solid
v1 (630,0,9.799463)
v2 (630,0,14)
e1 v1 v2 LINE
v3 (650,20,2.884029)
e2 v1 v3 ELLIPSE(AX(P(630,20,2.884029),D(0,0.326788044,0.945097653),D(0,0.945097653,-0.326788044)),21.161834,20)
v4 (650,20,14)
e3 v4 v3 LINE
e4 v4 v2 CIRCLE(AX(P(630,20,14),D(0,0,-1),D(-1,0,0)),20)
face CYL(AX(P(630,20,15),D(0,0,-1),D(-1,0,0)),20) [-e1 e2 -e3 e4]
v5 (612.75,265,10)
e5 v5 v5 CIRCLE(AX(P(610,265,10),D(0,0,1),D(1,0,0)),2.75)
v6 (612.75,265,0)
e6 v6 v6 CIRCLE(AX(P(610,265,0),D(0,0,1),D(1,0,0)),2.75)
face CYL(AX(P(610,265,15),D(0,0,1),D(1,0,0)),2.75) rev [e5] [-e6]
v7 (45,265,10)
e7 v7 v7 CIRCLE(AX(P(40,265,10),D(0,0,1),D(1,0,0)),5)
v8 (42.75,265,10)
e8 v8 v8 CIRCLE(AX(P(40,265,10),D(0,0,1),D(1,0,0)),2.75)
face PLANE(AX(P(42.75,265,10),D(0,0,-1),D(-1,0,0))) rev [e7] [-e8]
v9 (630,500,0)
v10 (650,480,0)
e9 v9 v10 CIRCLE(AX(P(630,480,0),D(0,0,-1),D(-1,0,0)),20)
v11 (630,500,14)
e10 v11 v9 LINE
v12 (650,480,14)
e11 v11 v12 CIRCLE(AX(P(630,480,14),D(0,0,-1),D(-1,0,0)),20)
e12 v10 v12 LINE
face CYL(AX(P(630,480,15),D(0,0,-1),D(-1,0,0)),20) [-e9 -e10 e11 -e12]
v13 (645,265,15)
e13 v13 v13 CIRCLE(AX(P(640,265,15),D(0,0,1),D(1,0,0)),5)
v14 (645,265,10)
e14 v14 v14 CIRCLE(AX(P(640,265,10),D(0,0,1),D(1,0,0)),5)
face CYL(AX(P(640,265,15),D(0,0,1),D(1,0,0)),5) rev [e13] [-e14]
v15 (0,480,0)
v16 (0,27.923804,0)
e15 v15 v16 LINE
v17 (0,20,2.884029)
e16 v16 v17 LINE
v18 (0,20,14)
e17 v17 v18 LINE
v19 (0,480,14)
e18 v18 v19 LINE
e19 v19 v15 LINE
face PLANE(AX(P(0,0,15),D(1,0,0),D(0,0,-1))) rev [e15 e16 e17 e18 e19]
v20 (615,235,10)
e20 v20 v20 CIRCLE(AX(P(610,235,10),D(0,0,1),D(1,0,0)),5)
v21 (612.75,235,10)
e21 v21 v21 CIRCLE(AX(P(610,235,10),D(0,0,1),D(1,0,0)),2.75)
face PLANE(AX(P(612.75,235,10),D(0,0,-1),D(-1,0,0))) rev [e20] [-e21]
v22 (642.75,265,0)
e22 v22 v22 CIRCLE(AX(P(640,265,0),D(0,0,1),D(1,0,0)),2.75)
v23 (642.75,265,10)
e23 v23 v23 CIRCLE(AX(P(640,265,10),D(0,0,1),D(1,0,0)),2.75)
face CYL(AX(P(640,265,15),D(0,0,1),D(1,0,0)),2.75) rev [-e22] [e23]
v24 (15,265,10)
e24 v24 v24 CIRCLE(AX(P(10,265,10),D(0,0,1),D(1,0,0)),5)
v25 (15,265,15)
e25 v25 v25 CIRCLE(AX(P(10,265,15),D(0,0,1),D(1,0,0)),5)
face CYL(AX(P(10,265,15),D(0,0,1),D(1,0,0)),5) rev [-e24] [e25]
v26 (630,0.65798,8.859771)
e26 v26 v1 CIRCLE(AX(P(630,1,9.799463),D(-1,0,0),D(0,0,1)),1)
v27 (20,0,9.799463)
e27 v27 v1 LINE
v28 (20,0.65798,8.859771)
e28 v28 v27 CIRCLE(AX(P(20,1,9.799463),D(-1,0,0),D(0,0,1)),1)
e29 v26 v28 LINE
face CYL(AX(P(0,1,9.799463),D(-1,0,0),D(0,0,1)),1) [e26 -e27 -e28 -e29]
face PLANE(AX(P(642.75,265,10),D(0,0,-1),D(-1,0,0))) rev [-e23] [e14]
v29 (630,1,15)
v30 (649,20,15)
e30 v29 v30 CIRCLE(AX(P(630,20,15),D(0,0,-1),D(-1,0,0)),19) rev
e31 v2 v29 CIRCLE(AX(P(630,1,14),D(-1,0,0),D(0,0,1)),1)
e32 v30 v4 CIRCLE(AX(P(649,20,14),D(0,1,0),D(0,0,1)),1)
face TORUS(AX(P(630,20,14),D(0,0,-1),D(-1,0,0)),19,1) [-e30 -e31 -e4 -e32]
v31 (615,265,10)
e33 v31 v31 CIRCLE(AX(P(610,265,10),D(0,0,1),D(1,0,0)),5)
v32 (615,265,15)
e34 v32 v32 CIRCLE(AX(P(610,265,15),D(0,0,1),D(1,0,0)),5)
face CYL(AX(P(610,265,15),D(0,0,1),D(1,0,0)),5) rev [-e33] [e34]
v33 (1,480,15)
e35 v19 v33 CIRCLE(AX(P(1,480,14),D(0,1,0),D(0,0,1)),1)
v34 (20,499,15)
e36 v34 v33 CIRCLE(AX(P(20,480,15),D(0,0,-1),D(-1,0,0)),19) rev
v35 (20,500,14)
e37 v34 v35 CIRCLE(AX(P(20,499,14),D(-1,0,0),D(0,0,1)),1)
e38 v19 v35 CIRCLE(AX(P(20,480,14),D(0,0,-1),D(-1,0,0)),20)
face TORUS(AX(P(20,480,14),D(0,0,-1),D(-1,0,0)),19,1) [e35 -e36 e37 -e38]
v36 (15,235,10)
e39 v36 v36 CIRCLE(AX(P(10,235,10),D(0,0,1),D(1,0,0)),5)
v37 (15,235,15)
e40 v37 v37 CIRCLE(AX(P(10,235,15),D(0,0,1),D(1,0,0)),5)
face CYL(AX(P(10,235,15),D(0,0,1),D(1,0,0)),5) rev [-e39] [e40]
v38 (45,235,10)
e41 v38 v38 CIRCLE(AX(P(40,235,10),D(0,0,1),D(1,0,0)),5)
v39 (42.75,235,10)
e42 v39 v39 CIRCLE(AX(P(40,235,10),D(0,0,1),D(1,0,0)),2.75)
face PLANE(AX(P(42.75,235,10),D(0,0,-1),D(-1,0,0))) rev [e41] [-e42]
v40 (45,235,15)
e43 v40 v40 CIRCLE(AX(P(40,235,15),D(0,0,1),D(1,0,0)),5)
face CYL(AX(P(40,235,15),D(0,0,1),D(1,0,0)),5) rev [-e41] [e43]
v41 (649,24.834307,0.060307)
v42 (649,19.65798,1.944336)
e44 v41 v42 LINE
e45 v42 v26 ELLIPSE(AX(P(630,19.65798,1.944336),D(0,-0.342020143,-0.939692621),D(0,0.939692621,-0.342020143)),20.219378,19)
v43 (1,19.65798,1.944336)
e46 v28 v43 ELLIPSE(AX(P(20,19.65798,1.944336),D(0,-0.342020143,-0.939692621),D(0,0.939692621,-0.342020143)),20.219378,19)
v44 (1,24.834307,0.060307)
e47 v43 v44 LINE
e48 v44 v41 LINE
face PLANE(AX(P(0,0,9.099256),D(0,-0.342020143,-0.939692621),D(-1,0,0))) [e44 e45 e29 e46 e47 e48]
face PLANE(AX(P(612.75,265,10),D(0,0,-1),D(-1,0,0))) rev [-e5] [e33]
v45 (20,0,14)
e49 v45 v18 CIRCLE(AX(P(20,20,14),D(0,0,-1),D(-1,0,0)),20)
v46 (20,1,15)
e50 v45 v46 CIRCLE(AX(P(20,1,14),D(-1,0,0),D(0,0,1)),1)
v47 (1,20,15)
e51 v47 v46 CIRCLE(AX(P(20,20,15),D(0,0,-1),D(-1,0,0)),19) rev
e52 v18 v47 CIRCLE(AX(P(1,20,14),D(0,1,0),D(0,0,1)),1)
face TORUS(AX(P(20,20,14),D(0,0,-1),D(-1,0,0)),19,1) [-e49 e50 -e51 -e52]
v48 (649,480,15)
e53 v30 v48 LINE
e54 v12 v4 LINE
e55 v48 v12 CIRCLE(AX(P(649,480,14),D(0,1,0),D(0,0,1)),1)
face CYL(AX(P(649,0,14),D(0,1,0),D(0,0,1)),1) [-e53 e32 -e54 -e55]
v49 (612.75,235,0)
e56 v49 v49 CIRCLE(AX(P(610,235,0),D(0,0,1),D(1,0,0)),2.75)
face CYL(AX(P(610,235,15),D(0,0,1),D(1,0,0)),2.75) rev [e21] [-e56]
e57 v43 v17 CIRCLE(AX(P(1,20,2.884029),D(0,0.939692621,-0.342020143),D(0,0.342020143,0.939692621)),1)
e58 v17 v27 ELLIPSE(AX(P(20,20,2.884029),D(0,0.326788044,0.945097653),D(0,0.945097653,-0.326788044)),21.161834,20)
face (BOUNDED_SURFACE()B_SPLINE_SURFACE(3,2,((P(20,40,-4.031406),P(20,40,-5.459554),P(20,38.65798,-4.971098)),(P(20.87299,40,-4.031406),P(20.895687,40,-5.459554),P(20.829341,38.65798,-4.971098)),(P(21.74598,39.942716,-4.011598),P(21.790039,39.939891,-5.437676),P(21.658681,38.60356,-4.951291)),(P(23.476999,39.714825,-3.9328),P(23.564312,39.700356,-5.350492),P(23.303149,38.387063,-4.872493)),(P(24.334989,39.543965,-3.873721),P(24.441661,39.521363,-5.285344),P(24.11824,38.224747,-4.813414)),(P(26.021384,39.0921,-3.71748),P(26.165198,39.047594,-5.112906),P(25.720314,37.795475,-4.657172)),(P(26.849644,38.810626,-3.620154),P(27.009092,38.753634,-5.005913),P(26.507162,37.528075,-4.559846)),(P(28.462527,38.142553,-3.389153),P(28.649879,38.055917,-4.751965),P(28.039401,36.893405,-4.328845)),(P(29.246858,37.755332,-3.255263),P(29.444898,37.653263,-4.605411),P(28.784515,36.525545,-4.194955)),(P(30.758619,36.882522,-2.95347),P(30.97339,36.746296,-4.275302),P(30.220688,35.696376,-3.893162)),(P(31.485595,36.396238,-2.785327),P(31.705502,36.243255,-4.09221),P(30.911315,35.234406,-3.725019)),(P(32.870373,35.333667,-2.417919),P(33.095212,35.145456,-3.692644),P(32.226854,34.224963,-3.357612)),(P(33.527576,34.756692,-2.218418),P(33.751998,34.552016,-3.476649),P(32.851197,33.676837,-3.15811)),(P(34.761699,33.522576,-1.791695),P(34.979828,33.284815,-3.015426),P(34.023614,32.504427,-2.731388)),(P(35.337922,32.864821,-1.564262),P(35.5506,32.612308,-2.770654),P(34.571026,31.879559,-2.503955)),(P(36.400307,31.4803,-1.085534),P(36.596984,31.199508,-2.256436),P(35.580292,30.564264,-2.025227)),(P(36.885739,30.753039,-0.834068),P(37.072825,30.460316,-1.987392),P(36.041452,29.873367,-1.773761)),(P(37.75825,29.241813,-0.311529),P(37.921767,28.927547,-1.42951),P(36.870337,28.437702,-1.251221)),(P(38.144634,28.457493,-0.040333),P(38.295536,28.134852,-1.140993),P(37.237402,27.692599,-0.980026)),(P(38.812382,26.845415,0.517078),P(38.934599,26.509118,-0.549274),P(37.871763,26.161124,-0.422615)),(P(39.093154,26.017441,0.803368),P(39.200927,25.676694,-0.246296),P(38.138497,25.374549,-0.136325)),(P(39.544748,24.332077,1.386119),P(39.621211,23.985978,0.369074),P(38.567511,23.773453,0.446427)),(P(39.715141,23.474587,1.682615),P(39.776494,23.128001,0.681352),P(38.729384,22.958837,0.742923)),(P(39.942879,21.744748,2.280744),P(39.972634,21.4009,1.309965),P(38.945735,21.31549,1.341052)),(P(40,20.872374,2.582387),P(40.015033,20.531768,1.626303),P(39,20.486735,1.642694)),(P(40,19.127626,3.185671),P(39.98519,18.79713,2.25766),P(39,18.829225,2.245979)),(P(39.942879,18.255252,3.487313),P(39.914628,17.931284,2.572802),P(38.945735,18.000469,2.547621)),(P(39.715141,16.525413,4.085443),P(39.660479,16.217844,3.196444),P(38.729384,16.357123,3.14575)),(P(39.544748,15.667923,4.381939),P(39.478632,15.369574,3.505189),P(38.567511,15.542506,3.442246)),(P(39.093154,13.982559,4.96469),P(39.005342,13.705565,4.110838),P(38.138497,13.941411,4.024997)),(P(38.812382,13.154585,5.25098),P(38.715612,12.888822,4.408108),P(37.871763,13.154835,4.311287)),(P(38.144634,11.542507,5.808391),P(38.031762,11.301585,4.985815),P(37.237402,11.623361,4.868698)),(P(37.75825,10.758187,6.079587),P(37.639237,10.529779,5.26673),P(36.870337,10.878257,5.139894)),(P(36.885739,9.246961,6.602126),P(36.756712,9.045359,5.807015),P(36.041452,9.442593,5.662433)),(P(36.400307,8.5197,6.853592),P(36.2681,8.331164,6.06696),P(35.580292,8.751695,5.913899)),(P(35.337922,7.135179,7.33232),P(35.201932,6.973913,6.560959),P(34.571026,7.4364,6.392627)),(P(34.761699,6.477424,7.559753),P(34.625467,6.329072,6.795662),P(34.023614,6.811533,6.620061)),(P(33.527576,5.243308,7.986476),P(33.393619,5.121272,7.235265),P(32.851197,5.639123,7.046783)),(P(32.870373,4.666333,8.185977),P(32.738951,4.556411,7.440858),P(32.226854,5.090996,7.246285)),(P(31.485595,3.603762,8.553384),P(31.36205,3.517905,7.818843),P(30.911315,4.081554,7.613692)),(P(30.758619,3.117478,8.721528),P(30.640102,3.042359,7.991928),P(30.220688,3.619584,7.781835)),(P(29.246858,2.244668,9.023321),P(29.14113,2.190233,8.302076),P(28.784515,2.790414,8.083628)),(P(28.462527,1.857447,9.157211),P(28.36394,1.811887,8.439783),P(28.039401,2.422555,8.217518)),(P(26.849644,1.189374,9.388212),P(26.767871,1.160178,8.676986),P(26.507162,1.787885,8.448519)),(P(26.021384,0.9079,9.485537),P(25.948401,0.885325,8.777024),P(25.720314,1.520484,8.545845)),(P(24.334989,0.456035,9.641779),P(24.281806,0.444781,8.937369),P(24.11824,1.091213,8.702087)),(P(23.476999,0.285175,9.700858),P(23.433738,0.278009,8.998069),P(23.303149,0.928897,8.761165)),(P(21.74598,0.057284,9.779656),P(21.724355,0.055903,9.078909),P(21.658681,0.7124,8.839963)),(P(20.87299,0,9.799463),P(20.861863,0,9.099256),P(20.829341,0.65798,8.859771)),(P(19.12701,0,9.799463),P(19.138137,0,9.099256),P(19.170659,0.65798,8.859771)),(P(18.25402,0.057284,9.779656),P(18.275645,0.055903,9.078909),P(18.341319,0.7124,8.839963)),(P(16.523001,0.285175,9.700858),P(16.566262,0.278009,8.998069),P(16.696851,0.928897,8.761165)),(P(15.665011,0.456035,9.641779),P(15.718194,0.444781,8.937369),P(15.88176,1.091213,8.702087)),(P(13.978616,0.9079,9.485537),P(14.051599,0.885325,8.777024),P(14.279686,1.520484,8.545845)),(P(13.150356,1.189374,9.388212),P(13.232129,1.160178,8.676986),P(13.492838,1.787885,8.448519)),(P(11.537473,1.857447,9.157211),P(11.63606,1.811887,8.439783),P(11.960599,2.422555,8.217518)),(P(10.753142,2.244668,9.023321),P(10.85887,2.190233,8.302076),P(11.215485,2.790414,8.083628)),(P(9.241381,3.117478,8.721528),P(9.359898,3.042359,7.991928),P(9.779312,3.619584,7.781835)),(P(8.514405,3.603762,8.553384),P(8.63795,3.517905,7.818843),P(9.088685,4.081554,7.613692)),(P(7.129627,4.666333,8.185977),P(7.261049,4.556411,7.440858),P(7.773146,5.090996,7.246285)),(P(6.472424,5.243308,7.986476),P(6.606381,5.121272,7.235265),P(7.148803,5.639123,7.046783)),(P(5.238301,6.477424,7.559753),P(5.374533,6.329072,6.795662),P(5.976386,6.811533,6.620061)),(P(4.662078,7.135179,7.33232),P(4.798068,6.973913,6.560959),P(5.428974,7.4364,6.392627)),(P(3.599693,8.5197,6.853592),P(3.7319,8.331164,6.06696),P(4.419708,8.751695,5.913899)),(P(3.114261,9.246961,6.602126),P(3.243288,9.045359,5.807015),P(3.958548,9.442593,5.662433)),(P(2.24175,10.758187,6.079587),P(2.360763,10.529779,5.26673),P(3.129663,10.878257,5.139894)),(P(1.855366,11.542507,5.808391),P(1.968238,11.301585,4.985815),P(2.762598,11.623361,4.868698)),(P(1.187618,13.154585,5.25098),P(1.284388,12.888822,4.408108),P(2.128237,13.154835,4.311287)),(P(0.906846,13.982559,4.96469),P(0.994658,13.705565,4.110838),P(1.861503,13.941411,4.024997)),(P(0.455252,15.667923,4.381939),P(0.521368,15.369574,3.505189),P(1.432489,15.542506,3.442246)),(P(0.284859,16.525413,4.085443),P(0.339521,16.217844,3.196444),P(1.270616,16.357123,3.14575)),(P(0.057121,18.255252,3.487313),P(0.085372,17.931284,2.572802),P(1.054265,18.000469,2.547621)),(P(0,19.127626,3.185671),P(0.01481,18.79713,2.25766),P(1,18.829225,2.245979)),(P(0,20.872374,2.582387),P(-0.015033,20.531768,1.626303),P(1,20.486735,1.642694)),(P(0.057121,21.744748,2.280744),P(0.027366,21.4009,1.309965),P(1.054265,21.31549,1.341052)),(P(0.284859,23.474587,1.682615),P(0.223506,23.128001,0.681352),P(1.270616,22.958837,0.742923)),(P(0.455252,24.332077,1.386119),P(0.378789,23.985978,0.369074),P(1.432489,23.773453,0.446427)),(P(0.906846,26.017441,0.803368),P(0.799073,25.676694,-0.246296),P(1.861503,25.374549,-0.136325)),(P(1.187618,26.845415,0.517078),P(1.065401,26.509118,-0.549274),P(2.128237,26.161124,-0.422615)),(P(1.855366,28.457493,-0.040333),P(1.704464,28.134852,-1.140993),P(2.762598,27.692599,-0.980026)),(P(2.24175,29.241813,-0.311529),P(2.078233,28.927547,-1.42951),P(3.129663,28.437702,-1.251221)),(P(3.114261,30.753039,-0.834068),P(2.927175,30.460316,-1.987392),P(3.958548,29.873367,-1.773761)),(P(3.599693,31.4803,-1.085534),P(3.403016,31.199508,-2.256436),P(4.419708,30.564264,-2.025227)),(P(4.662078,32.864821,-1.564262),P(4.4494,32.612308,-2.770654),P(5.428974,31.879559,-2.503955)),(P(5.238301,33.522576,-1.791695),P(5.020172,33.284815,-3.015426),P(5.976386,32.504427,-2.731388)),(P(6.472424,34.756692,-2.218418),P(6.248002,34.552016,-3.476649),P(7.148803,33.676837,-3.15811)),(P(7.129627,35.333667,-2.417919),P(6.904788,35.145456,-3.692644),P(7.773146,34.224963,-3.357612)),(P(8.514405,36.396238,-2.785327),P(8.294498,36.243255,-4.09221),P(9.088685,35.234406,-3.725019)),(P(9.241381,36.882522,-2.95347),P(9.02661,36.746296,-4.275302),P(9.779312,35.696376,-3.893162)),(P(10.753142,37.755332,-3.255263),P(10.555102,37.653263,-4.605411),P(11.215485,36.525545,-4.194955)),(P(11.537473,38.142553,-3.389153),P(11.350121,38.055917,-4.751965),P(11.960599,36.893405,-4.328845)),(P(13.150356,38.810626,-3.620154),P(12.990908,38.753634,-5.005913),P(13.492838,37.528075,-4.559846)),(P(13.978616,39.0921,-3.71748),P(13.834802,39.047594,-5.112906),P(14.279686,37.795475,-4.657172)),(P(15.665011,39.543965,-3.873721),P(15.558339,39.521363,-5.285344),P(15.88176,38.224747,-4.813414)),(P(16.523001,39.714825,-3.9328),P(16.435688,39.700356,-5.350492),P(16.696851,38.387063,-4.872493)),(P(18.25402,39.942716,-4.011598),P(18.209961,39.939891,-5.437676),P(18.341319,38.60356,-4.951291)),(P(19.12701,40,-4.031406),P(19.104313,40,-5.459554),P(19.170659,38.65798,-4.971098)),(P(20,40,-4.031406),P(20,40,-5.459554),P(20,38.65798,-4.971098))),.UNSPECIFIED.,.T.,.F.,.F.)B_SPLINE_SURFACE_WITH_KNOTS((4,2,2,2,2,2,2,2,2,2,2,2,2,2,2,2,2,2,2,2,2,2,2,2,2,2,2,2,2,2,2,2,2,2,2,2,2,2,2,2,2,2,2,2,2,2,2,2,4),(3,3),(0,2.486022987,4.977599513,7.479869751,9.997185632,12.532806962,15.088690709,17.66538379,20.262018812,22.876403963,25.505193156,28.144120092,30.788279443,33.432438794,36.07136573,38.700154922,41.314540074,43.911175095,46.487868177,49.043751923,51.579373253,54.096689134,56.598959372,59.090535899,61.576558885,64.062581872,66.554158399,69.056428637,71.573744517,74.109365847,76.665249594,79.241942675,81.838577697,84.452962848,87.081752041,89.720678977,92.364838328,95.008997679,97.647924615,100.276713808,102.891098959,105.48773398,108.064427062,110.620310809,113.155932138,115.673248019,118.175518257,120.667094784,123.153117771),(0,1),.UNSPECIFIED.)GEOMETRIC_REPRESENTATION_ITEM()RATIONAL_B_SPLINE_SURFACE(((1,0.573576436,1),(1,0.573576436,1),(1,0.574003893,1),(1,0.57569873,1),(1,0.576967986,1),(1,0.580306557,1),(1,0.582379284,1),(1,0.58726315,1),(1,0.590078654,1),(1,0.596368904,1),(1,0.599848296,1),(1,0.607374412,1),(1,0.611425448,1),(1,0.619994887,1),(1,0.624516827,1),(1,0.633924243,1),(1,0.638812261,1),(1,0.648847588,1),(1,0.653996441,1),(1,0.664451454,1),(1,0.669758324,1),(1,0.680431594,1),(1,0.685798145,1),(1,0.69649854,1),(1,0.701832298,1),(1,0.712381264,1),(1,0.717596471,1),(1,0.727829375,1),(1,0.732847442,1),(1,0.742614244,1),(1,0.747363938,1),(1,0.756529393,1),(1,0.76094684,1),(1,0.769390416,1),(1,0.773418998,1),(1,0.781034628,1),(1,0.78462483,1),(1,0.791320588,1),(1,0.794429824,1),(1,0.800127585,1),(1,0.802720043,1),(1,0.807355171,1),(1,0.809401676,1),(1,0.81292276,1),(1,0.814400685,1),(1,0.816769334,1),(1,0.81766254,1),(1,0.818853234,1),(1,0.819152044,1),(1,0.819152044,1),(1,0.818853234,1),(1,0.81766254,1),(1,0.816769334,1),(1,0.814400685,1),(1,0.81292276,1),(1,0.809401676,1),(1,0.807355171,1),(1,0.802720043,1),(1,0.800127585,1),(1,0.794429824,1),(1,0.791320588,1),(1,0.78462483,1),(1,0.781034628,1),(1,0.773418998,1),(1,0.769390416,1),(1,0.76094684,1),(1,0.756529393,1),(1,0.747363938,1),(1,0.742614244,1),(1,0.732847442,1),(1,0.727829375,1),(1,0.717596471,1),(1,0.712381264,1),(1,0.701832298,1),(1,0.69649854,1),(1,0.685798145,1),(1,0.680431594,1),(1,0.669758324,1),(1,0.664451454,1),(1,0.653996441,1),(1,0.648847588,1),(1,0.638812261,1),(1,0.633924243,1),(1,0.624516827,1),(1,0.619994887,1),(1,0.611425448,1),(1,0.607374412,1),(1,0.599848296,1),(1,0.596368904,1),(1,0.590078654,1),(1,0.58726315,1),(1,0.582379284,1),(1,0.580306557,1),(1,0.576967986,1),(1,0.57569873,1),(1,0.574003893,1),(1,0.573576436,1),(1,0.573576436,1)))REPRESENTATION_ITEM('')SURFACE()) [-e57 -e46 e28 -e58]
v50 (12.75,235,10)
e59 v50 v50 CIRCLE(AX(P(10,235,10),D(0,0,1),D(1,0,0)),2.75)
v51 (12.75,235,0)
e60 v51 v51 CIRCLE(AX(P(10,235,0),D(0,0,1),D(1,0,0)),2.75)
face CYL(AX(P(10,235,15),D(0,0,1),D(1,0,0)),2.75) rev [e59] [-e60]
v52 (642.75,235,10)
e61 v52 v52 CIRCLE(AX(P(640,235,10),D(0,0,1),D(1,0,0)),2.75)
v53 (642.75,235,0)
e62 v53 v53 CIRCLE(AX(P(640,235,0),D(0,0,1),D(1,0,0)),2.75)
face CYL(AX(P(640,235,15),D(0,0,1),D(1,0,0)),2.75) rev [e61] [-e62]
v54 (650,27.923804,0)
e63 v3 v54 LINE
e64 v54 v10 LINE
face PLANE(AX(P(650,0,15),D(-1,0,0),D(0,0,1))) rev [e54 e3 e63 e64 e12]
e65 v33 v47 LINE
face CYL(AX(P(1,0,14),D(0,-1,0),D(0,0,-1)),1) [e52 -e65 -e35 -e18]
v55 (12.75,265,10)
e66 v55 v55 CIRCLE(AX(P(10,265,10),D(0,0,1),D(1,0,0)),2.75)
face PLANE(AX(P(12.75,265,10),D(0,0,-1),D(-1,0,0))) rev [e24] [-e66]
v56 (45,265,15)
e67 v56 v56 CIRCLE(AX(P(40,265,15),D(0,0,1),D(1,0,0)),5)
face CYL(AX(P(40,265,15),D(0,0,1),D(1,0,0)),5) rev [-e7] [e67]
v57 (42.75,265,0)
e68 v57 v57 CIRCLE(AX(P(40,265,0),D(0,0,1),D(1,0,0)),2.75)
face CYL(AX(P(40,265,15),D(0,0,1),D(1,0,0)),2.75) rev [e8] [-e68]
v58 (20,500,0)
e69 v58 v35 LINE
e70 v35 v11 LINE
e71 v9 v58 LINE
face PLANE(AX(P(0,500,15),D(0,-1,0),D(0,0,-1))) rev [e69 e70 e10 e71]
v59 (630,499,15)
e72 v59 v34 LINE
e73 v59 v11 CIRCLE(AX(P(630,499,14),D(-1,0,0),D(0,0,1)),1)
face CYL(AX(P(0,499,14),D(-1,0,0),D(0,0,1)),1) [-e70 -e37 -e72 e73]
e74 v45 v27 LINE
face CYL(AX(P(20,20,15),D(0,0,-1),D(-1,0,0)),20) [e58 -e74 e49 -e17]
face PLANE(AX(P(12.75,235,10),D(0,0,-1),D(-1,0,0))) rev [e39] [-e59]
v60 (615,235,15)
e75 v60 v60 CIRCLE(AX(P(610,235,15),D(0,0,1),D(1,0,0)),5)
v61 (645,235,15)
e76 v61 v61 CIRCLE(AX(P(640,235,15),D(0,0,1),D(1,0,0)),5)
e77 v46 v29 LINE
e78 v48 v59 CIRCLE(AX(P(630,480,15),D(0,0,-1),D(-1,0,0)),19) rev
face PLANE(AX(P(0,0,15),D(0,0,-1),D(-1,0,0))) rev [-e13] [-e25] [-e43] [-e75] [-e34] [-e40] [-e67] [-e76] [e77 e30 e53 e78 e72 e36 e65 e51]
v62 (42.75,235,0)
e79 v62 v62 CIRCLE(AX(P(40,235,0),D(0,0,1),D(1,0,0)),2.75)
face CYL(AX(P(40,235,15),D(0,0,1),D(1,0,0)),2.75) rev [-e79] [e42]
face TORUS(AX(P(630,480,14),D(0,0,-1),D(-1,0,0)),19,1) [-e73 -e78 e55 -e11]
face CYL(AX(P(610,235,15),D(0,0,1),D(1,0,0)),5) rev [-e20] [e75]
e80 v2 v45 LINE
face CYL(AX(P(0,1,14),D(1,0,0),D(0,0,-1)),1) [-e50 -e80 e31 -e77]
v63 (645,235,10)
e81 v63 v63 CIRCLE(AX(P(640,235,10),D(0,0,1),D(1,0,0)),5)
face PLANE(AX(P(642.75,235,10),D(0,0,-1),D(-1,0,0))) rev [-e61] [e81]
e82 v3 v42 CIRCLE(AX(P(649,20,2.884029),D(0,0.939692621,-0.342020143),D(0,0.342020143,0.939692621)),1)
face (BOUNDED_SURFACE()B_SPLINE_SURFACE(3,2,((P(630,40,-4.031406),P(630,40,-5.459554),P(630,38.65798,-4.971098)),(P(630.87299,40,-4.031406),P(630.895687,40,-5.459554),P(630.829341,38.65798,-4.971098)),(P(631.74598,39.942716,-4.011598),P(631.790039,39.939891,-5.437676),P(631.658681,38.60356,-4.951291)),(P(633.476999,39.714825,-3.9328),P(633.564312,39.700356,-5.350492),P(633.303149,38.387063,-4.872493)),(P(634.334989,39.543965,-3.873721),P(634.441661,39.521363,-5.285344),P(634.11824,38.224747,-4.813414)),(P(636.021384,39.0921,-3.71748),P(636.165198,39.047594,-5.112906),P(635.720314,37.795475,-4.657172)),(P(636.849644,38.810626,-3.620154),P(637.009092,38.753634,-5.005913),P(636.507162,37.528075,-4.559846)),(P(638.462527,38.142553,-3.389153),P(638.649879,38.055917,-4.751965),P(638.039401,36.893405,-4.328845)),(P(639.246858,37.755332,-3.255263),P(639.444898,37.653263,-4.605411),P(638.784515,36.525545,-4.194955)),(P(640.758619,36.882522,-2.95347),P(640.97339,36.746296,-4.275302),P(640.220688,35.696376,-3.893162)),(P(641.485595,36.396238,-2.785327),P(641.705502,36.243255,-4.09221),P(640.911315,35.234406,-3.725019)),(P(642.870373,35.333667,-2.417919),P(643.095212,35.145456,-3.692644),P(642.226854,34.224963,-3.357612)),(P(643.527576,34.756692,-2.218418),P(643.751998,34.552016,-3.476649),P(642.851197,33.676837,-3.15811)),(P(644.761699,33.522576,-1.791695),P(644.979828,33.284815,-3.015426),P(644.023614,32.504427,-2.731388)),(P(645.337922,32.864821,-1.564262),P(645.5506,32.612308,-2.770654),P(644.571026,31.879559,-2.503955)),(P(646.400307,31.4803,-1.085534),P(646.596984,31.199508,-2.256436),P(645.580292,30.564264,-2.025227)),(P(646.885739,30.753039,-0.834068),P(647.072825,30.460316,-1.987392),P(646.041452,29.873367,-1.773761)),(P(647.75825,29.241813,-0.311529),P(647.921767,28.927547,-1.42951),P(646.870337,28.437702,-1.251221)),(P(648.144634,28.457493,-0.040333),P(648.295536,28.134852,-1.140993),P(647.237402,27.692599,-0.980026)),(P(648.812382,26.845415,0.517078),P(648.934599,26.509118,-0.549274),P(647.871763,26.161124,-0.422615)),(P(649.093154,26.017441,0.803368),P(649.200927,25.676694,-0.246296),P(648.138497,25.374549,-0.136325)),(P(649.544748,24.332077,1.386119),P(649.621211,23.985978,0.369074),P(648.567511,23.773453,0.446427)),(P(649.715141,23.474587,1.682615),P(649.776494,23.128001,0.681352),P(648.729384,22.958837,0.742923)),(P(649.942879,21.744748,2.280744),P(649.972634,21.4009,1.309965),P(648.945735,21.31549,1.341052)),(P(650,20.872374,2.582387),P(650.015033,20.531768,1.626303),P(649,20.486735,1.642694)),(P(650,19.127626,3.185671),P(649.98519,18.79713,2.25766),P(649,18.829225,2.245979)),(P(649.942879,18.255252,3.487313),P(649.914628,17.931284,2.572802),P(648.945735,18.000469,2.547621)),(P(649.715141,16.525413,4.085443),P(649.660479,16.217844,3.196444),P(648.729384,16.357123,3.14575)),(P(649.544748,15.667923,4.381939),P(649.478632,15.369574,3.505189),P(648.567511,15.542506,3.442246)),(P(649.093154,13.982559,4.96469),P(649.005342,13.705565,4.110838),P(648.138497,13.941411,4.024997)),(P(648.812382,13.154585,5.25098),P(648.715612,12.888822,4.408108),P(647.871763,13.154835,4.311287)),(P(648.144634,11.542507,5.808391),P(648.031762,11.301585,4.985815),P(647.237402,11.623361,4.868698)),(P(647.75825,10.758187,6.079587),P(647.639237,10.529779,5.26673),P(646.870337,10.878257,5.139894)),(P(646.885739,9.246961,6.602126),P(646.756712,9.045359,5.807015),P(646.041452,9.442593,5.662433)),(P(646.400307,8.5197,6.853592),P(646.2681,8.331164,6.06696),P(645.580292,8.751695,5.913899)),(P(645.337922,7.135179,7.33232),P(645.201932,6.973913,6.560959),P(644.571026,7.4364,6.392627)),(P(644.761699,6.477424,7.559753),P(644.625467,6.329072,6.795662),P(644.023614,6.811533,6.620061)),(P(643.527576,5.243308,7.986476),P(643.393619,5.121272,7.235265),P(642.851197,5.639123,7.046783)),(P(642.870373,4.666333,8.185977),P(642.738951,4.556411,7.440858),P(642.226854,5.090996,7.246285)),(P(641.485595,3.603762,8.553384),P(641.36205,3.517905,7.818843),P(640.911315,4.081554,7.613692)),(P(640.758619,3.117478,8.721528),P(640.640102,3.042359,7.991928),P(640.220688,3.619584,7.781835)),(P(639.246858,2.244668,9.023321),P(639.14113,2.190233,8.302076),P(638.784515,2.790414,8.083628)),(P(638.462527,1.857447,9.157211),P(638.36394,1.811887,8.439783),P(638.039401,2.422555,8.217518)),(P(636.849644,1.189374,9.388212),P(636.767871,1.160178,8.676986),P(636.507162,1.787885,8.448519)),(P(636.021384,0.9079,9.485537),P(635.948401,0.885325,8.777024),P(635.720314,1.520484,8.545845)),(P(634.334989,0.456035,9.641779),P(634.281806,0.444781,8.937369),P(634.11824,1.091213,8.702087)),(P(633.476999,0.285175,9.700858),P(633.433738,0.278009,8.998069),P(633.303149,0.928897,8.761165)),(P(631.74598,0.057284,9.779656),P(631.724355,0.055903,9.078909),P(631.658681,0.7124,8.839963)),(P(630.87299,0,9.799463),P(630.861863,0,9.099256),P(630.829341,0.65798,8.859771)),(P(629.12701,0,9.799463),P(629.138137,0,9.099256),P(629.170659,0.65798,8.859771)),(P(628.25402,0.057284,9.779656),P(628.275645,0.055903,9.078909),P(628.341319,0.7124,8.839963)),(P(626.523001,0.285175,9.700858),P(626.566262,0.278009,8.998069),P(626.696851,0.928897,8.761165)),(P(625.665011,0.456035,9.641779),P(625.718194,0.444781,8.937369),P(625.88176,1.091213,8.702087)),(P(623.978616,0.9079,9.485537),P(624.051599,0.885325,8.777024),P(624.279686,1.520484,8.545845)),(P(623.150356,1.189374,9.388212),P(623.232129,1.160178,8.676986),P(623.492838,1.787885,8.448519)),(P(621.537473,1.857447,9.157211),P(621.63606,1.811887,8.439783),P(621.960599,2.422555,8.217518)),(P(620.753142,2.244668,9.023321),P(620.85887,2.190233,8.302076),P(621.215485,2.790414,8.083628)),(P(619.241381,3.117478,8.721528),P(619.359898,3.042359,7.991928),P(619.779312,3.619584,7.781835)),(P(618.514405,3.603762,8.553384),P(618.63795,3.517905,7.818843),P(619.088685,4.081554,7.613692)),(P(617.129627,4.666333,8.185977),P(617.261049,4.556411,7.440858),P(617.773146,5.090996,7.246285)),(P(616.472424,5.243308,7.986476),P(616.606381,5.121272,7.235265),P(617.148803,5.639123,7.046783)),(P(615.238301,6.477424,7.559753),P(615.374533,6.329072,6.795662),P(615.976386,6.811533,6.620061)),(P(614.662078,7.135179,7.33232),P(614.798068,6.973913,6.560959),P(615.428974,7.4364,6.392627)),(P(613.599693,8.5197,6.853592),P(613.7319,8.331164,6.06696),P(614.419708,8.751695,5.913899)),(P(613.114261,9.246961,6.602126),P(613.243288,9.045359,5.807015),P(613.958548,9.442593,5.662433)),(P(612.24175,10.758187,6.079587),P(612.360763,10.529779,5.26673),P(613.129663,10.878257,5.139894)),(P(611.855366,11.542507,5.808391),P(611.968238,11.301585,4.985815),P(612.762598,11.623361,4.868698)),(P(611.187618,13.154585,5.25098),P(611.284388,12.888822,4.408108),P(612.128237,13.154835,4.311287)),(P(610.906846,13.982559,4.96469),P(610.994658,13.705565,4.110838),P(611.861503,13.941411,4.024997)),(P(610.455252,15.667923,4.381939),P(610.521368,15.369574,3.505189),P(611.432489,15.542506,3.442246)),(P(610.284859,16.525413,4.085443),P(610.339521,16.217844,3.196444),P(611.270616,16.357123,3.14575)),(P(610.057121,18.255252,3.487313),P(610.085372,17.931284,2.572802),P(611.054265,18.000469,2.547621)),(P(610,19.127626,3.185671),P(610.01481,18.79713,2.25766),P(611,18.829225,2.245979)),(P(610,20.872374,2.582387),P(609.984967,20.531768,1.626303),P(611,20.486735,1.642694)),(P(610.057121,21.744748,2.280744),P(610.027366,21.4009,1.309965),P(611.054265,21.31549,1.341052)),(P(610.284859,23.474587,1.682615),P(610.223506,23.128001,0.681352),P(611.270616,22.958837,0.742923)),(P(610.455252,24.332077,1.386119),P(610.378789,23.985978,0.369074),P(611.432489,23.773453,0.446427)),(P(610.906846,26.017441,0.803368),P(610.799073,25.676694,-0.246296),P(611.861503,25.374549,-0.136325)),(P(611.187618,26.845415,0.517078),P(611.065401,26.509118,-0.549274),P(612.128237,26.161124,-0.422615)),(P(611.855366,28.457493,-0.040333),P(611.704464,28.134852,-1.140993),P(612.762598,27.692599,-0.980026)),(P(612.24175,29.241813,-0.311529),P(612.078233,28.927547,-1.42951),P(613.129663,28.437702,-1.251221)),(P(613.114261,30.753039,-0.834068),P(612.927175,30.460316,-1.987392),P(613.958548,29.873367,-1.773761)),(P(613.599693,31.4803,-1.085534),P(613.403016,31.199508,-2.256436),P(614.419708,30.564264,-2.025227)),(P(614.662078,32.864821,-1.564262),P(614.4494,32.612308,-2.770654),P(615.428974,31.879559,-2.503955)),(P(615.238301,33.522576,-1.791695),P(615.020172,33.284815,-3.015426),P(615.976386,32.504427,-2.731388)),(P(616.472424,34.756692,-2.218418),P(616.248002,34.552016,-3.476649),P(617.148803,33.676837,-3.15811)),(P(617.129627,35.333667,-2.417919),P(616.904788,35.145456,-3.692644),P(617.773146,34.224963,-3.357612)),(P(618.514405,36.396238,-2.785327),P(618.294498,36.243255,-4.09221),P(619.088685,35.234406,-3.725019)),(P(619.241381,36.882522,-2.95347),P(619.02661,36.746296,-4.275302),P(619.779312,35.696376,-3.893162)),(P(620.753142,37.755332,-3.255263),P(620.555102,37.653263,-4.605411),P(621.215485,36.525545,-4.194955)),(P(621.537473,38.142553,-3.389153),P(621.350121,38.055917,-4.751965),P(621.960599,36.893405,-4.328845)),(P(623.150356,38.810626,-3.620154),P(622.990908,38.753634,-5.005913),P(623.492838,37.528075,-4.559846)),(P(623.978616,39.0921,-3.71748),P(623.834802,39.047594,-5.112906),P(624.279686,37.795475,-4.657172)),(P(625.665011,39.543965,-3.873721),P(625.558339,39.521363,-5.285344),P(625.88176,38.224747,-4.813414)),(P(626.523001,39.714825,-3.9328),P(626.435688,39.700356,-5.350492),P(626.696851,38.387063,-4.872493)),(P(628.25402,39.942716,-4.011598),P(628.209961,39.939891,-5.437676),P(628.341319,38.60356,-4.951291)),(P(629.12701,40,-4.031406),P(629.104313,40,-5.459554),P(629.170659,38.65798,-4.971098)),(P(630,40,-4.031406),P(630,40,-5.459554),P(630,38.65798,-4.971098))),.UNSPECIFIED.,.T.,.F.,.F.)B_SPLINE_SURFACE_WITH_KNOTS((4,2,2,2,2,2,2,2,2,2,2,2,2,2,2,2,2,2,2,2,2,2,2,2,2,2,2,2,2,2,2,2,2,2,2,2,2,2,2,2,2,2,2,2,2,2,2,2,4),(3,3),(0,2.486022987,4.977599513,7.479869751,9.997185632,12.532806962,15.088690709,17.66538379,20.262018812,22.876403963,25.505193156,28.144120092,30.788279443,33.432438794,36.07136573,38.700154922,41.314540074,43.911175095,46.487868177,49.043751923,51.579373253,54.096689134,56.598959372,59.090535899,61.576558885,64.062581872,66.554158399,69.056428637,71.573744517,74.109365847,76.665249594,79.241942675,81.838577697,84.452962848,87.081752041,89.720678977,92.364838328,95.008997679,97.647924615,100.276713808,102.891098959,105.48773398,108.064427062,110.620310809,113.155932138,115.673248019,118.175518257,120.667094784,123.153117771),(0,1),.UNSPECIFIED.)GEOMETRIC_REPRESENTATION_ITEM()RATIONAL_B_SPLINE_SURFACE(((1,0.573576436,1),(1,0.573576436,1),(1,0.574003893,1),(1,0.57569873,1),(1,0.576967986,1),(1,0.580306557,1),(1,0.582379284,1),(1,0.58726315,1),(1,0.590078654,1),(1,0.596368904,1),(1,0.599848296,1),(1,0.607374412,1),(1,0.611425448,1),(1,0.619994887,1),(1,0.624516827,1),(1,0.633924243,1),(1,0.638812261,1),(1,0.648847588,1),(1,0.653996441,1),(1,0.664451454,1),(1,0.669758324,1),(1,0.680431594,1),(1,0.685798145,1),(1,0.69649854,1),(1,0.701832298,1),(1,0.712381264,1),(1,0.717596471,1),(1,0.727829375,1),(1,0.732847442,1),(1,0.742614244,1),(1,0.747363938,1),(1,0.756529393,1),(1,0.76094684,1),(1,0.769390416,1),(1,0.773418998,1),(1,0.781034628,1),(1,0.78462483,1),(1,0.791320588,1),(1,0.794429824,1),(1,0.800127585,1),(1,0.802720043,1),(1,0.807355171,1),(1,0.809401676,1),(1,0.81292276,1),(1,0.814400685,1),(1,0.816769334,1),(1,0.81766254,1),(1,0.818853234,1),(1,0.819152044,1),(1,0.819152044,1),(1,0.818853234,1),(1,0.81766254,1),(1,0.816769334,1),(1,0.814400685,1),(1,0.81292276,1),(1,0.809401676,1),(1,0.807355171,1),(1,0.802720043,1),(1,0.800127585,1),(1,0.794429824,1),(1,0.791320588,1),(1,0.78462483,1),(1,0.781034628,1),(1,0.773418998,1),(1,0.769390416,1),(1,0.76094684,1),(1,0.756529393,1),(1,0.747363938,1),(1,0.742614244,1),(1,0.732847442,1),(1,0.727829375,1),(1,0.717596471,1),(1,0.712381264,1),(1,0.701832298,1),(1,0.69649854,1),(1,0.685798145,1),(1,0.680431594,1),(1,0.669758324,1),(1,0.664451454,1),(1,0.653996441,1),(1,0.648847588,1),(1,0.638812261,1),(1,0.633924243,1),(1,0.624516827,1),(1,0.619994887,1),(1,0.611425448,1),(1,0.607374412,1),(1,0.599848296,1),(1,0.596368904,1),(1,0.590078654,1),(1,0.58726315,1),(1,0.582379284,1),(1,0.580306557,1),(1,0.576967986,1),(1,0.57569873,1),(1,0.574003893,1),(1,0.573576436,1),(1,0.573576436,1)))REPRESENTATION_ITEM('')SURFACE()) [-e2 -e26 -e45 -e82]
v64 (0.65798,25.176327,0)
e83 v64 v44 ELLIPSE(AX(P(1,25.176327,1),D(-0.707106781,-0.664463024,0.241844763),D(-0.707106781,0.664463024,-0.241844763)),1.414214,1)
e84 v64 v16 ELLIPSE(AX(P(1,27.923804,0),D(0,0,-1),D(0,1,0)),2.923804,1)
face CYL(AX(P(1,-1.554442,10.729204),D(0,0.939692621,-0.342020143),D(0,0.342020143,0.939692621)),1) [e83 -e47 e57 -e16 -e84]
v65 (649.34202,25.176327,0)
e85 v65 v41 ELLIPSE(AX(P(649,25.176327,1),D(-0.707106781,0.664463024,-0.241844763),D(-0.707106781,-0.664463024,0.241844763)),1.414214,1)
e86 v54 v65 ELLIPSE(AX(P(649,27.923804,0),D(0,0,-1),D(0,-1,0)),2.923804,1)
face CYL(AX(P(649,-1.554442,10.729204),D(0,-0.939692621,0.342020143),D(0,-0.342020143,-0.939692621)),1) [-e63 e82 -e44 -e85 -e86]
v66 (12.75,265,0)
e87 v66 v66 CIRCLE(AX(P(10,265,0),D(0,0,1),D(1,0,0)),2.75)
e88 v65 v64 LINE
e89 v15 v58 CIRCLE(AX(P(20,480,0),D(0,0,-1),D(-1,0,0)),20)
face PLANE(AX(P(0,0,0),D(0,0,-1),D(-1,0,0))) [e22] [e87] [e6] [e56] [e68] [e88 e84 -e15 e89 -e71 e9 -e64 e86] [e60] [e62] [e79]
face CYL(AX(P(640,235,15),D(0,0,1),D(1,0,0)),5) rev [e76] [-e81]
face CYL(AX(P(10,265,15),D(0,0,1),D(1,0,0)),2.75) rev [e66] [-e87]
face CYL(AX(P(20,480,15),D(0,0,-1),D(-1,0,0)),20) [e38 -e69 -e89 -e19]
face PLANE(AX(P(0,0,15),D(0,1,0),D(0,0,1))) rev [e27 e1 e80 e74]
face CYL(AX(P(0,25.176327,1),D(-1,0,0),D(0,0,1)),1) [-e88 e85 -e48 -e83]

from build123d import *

# Parameters (mm, degrees)
SKETCH1_W                              = 650
SKETCH1_H                              = 500
BASE_DEPTH                             = 15
COUNTERBORED_M5_BOLT_HOLES_D           = 5.5
COUNTERBORED_M5_BOLT_HOLES_CBORE_D     = 10
COUNTERBORED_M5_BOLT_HOLES_CBORE_DEPTH = 5
ROUND_CORNERS_R                        = 20
BREAK_TOP_EDGE_R                       = 1
CHAMFER2_SIZE                          = 9.099255857
CHAMFER2_SIZE_2                        = 25
FILLET3_R                              = 1


with BuildPart() as part:
    # Sketch1 → base (new body)
    with BuildSketch(Plane.XY):
        with Locations((325, 250)):
            Rectangle(SKETCH1_W, SKETCH1_H)
    extrude(amount=BASE_DEPTH)

    # counterbored M5 bolt holes (through all)
    with Locations(Plane.XY.offset(15)):
        with Locations((10, 265), (40, 235), (10, 235), (40, 265)):
            counterbored_m5_bolt_holes = CounterBoreHole(COUNTERBORED_M5_BOLT_HOLES_D / 2, COUNTERBORED_M5_BOLT_HOLES_CBORE_D / 2, COUNTERBORED_M5_BOLT_HOLES_CBORE_DEPTH)

    # mirror counterbored bolt holes: counterbored M5 bolt holes across plane
    add(counterbored_m5_bolt_holes.mirror(Plane.ZY.offset(-325)), mode=Mode.SUBTRACT)

    # round corners
    round_corners_edges = [part.edges().sort_by_distance(p)[0] for p in [
        (0, 500, 7.5),
        (650, 500, 7.5),
        (650, 0, 7.5),
        (0, 0, 7.5),
    ]]
    fillet(round_corners_edges, radius=ROUND_CORNERS_R)

    # break top edge
    break_top_edge_edges = [part.edges().sort_by_distance(p)[0] for p in [
        (0, 250, 15),
        (325, 500, 15),
        (325, 0, 15),
        (650, 250, 15),
        (5.857864376, 5.857864376, 15),
        (644.142135624, 5.857864376, 15),
        (644.142135624, 494.142135624, 15),
        (5.857864376, 494.142135624, 15),
    ]]
    fillet(break_top_edge_edges, radius=BREAK_TOP_EDGE_R)

    # Chamfer2
    # the kernel refuses this chamfer: 25, 9.099255857 mm, written as the material it takes off along each edge
    with BuildSketch(Plane(origin=(-44.854868314, 0, 0), x_dir=(0, -0.09904090225204935, 0.9950833631817486), z_dir=(1, 0, 0))) as chamfer2_piece_1:
        Polygon((CHAMFER2_SIZE * 0.995083363144, -CHAMFER2_SIZE * 0.0990409022483), (-CHAMFER2_SIZE_2 * 0.099040902252, -CHAMFER2_SIZE_2 * 0.995083363182), (0, 0), align=None)
    extrude(amount=739.709736628, mode=Mode.SUBTRACT)

    # Fillet3
    fillet3_edges = [part.edges().sort_by_distance(p)[0] for p in [
        (325, 0, 9.099255857),
        (644.360022397, 6.079161061, 6.886622181),
        (650, 22.5, 0.909925586),
        (325, 25, 0),
        (0, 22.5, 0.909925586),
        (5.639977603, 6.079161061, 6.886622181),
    ]]
    fillet(fillet3_edges, radius=FILLET3_R)


solid = part.part
